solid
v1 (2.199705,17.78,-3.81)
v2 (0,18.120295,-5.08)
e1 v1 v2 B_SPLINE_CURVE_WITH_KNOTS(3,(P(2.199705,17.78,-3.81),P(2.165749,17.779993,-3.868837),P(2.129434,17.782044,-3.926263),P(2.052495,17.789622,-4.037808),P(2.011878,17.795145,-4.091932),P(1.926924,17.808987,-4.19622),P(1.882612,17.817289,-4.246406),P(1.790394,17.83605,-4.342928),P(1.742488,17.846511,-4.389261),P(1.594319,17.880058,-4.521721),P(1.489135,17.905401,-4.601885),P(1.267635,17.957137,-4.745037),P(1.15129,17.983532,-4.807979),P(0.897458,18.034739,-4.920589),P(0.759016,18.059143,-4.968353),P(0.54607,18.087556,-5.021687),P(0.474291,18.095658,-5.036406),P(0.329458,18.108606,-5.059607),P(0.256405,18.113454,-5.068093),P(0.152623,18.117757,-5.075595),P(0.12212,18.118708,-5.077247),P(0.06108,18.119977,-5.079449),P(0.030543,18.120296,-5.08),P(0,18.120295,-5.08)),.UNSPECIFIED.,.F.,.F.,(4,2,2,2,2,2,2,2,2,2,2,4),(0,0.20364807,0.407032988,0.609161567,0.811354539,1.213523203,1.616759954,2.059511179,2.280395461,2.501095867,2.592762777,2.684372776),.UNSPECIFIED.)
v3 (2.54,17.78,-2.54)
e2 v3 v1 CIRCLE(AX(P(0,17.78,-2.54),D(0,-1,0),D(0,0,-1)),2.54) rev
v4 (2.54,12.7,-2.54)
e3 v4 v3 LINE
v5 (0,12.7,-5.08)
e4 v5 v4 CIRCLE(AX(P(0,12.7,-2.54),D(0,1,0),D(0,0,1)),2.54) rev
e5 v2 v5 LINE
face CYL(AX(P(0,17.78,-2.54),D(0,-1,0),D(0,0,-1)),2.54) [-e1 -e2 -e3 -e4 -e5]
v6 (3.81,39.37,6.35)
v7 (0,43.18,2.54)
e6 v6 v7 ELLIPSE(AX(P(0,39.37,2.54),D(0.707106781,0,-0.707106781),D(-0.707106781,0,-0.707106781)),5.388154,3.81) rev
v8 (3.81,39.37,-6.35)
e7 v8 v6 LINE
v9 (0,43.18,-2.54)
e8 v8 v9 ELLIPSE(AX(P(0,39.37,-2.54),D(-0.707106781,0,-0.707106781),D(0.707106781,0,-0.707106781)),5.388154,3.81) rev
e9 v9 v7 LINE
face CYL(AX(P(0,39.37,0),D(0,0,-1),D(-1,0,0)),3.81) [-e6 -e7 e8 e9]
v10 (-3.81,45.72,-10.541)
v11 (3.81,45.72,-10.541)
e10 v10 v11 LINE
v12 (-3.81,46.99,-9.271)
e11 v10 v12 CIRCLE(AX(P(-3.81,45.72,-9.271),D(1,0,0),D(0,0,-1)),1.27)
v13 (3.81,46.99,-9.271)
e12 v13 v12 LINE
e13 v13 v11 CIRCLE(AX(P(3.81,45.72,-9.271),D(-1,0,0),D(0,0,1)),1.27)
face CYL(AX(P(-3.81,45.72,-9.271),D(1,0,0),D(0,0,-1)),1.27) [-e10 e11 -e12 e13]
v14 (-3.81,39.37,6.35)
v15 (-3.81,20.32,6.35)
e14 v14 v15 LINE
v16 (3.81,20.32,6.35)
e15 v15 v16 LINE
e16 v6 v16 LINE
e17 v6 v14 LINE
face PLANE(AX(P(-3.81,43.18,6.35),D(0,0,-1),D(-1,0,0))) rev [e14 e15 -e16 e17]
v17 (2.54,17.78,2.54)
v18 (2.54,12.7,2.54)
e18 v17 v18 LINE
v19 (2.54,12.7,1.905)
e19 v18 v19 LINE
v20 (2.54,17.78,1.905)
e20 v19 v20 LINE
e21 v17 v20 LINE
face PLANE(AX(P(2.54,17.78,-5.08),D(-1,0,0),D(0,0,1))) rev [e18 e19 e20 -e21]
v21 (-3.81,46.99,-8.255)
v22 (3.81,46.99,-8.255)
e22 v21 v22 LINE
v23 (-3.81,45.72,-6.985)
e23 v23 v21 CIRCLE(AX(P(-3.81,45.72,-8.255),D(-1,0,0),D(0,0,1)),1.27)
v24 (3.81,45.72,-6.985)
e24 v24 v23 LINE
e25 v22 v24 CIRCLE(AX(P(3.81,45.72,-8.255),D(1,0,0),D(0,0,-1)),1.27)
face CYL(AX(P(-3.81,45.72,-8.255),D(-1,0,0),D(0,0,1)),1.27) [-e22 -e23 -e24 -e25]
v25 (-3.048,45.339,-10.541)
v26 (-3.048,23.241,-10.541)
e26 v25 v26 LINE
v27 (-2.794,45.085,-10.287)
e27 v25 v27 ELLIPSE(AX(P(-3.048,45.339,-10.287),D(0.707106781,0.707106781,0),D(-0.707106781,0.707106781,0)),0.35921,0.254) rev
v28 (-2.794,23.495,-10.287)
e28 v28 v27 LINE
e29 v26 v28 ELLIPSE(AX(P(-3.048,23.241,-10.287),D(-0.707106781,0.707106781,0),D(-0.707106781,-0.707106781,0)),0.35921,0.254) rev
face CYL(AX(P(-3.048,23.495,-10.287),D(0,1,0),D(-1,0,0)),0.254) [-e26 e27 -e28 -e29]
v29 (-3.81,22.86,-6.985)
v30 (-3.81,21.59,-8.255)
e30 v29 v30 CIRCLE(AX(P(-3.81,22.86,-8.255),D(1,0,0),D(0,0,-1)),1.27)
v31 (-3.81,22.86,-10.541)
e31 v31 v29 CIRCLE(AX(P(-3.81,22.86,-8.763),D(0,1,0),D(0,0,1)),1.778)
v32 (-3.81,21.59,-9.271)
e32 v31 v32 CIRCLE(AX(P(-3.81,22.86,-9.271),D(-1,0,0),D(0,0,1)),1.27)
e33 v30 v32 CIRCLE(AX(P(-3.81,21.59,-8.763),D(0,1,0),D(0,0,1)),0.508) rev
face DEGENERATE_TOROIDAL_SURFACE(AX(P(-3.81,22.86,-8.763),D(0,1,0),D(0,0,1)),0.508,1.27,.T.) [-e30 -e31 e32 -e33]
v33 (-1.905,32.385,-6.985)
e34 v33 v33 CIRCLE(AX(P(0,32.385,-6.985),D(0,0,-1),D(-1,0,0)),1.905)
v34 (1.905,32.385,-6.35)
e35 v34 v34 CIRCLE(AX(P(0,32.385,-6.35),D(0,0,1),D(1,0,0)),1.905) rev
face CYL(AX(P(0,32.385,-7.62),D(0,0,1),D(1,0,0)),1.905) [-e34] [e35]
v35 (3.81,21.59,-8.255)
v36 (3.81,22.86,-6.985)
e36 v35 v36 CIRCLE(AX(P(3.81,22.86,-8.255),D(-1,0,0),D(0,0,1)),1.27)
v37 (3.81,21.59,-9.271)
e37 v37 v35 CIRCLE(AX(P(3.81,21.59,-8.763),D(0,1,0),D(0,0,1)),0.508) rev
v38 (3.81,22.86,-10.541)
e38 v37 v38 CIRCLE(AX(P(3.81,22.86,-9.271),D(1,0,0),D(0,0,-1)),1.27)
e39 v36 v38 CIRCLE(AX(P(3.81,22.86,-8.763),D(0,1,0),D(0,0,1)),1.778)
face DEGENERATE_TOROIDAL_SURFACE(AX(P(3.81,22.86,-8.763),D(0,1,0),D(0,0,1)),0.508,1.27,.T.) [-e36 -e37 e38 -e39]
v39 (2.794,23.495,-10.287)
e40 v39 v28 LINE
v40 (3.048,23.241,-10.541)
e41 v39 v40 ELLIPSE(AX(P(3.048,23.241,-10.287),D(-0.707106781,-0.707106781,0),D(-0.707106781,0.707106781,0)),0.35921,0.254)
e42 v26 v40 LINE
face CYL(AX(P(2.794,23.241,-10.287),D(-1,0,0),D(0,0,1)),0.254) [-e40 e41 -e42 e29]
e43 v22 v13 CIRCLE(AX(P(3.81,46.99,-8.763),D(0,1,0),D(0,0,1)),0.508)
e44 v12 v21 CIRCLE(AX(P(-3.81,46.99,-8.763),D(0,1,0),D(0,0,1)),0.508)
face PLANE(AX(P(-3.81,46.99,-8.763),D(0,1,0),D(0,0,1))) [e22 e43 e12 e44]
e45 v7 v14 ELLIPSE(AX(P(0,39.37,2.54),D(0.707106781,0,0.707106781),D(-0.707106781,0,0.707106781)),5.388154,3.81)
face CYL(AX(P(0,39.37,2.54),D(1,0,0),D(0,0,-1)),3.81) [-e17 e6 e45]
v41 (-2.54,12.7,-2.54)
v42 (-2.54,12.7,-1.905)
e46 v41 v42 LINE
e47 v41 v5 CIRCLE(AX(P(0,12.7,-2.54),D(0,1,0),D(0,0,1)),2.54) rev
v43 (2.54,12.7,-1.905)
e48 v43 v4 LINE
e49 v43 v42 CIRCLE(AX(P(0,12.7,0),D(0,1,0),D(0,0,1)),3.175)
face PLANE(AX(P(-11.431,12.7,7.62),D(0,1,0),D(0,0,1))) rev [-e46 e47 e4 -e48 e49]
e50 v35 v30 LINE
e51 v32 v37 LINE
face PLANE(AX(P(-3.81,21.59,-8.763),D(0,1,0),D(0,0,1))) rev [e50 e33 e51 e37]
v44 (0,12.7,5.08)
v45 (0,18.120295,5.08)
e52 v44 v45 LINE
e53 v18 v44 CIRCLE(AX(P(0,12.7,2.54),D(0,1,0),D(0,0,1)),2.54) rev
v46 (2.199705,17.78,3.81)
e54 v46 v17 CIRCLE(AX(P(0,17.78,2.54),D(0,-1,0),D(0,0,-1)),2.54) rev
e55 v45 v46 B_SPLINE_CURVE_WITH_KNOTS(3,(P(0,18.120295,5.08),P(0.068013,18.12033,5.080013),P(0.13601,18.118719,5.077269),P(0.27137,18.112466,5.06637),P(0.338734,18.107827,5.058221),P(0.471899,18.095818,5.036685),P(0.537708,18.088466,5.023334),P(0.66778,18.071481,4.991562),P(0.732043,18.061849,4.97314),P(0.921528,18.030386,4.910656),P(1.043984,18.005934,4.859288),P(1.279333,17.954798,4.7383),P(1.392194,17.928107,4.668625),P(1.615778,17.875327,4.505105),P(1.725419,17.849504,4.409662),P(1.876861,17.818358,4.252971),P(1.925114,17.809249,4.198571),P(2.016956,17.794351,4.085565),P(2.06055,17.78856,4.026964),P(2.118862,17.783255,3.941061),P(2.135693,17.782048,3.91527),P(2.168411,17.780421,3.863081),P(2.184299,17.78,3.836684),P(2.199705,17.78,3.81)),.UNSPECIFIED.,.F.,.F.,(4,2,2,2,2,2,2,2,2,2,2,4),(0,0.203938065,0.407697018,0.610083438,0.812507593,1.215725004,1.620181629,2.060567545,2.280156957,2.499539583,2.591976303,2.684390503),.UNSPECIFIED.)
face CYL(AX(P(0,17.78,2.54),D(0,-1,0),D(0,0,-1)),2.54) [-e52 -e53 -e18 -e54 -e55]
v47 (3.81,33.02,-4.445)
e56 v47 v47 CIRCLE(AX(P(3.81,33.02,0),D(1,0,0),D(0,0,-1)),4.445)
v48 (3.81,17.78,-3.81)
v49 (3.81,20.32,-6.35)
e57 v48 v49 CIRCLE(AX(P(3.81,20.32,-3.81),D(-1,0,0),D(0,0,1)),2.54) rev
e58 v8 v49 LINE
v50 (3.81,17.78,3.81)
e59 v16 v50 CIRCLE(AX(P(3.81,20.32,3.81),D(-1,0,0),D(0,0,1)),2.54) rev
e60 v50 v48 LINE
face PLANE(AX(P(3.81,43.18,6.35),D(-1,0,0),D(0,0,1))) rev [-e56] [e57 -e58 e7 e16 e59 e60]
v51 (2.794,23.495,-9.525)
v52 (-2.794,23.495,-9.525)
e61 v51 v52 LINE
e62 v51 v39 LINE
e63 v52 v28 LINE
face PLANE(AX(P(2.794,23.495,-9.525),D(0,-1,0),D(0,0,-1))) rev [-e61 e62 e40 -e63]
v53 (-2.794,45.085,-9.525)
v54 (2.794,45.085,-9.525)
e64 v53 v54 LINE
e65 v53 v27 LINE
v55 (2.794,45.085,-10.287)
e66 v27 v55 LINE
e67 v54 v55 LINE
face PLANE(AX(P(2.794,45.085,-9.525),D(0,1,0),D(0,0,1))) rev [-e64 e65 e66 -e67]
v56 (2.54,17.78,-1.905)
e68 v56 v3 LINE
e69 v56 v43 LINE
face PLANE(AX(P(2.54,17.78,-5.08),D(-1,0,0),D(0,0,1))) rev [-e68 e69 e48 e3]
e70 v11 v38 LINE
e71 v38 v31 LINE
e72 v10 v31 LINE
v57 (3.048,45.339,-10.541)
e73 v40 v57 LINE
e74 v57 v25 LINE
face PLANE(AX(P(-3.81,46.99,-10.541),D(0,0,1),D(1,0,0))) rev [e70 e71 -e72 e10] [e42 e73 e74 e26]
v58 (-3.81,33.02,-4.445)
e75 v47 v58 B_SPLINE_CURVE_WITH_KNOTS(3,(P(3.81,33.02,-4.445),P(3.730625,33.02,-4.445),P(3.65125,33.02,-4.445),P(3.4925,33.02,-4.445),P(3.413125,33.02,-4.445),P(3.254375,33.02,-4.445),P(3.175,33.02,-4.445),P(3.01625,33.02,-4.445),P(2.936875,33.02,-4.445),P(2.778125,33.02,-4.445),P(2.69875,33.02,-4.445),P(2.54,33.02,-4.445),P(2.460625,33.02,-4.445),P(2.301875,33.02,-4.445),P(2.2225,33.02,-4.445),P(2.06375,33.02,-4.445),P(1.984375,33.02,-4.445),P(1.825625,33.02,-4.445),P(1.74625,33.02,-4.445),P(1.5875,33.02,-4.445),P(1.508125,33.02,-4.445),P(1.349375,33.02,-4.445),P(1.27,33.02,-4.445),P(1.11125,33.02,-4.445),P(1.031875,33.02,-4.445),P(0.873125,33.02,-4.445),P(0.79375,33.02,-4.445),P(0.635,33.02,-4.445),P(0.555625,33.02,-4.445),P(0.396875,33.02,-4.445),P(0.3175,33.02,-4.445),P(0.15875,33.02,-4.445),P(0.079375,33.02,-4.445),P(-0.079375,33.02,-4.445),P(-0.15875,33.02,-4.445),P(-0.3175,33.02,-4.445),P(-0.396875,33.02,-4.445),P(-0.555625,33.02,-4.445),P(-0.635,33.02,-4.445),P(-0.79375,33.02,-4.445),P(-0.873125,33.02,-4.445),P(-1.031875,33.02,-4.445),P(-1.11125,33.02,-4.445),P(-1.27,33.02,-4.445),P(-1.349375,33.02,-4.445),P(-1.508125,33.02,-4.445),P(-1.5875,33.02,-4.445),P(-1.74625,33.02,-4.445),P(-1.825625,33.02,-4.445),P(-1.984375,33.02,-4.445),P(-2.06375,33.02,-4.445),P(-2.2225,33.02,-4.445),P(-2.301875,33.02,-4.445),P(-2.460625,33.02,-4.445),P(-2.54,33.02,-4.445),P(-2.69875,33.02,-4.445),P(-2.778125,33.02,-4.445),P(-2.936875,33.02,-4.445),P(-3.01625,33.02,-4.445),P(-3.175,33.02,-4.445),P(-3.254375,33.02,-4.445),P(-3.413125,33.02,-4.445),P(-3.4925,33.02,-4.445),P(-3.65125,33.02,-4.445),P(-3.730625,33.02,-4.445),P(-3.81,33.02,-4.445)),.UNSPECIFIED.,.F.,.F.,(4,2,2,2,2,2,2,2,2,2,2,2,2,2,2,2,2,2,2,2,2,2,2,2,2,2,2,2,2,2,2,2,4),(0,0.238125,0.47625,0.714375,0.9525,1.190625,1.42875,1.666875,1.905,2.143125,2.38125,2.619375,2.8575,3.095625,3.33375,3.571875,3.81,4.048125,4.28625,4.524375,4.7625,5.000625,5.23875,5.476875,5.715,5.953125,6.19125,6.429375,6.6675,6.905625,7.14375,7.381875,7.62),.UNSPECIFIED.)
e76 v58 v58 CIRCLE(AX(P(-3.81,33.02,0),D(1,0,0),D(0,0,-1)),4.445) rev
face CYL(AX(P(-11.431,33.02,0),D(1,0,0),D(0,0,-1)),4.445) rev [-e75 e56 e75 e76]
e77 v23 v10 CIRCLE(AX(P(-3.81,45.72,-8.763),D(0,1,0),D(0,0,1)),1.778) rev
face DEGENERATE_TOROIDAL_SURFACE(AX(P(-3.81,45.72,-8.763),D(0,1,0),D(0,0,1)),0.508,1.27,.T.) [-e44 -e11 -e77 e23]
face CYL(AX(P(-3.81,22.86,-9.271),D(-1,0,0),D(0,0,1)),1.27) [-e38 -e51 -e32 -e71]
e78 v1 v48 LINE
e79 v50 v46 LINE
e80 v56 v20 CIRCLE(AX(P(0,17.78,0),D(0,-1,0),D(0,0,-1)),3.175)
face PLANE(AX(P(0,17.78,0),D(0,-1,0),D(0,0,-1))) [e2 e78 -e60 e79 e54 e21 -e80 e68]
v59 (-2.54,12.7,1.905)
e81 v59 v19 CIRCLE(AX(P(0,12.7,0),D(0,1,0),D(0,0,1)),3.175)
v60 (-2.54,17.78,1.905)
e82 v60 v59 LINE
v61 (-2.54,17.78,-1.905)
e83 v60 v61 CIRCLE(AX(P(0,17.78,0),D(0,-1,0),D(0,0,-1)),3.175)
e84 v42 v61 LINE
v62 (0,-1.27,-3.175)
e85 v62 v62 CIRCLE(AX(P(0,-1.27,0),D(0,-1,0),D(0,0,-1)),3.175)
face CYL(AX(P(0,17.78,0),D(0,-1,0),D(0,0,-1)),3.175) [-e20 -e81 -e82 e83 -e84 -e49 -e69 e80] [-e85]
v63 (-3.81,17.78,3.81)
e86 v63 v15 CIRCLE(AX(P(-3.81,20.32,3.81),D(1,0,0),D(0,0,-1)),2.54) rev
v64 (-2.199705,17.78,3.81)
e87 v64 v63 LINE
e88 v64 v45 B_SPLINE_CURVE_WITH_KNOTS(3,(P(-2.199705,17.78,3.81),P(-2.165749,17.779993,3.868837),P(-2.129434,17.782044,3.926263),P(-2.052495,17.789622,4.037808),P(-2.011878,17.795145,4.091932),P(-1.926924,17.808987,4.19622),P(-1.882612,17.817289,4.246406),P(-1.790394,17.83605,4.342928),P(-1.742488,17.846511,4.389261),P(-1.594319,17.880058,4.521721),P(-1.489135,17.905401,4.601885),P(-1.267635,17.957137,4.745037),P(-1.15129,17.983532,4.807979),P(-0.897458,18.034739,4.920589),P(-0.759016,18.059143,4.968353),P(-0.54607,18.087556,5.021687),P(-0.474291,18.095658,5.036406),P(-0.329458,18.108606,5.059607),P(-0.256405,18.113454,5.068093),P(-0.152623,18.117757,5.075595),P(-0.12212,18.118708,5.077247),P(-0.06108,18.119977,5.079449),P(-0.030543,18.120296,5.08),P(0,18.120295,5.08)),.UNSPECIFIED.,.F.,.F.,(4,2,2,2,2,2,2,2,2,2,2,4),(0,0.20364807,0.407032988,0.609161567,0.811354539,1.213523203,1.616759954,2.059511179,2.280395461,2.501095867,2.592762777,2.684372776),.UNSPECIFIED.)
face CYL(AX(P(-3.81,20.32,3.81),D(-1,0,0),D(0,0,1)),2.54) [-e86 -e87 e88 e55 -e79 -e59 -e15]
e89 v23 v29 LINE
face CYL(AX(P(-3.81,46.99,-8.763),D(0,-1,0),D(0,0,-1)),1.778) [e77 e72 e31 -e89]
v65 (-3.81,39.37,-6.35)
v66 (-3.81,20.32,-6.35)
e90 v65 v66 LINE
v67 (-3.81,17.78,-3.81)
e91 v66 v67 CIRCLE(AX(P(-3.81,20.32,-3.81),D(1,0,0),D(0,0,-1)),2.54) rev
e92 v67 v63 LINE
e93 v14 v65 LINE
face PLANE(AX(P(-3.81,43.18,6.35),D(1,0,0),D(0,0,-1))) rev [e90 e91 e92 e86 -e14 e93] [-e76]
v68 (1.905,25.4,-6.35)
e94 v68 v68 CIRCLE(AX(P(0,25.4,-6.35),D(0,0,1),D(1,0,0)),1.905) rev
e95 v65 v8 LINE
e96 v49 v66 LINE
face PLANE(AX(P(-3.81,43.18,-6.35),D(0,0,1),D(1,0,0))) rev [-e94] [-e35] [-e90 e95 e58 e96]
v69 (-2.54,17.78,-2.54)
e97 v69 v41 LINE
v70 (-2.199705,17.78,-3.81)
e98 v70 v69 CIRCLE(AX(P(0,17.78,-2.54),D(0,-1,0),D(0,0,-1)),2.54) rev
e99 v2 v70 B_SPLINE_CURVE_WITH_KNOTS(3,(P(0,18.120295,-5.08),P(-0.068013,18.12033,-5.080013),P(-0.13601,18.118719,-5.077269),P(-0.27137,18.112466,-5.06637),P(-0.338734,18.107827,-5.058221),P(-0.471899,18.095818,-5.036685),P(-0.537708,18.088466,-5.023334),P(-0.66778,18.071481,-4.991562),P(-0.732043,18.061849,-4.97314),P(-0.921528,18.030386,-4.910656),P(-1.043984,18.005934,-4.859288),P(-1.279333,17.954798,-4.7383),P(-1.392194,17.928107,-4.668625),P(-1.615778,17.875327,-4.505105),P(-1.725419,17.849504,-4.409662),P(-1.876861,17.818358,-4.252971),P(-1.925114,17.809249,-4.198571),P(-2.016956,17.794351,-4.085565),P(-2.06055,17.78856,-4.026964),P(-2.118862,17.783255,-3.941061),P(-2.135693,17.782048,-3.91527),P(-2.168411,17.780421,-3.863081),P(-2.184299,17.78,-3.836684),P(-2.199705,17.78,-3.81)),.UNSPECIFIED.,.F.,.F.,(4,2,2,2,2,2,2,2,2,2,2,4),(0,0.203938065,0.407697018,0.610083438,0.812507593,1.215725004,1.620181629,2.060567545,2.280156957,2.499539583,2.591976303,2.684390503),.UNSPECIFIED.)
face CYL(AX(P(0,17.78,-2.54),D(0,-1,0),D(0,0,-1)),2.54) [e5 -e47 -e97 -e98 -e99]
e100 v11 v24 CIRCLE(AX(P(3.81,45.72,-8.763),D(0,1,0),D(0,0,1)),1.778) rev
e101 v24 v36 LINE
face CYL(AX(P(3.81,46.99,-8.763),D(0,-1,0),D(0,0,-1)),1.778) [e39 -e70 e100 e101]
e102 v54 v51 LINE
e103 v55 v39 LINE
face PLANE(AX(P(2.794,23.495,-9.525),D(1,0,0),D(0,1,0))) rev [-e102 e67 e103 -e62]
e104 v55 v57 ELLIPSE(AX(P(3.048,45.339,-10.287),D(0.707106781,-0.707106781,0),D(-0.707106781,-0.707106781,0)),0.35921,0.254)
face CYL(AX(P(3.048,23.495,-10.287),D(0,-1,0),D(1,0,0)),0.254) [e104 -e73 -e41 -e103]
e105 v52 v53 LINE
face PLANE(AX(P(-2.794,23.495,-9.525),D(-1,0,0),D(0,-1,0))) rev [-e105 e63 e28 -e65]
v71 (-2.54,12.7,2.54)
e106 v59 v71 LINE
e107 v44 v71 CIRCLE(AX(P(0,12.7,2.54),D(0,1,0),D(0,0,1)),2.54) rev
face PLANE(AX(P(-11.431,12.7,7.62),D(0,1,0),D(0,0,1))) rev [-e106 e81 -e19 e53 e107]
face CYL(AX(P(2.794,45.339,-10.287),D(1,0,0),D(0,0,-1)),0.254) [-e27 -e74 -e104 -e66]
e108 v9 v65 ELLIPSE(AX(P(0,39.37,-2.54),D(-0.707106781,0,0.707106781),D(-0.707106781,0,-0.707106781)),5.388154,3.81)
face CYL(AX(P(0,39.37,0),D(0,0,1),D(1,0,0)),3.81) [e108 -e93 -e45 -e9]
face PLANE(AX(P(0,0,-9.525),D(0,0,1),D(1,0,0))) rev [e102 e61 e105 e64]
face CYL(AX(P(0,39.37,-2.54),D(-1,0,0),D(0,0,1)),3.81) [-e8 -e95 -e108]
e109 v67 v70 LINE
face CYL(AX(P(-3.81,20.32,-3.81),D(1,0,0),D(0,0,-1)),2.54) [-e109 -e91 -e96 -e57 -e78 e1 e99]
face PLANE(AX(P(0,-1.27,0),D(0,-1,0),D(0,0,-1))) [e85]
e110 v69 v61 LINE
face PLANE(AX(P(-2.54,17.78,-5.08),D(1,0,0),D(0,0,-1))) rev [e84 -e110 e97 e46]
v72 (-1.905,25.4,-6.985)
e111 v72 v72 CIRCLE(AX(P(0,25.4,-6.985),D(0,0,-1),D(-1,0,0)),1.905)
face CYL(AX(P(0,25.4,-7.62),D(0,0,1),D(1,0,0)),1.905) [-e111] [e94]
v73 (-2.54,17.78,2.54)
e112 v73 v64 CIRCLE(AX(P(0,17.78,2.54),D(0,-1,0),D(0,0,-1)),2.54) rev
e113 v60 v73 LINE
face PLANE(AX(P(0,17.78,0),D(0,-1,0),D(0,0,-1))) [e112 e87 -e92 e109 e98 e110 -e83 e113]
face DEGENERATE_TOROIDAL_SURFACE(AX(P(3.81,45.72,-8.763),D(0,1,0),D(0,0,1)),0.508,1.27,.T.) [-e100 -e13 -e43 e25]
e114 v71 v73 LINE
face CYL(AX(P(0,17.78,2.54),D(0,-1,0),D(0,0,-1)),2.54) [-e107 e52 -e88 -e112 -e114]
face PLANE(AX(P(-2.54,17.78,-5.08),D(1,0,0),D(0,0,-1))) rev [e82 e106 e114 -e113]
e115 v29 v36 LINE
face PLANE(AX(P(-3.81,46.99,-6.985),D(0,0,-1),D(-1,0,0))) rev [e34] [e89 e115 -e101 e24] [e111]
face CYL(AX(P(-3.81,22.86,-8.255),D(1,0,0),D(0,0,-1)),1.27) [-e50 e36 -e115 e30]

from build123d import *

# Parameters (mm, degrees)
SKETCH1_W                = 15.24
SKETCH1_H                = 25.4
BOSS_EXTRUDE1_DEPTH      = 5.08
FILLET1_R                = 2.54
SKETCH2_R                = 3.175
BOSS_EXTRUDE2_DEPTH      = 6.35
SKETCH3_W                = 5.08
SKETCH3_H                = 10.16
BOSS_EXTRUDE3_DEPTH      = 5.08
SKETCH4_W                = 7.62
SKETCH4_H                = 12.7
BOSS_EXTRUDE4_DEPTH      = 25.4
FILLET2_R                = 2.54
FILLET3_R                = 3.81
SKETCH5_R                = 1.905
BOSS_EXTRUDE5_DEPTH      = 1.27
BOSS_EXTRUDE6_DEPTH      = 25.4
FILLET4_R                = 1.27
SKETCH7_W                = 5.588
SKETCH7_H                = 21.59
CUT_EXTRUDE1_DEPTH       = 1.016
FILLET5_R                = 0.254
CUT_EXTRUDE2_REACH       = 52.512
SKETCH8_R                = 4.445
FILLET6_R                = 0.635
CUT_EXTRUDE3_REACH       = 55.308
SKETCH9_W                = 15.24
SKETCH9_H                = 25.4
BOSS_EXTRUDE7_DEPTH      = 13.97
BOSS_EXTRUDE7_DEPTH_BACK = 5.08
SKETCH10_R               = 3.175
FILLET7_R                = 2.54


# Some blends are built 0.0001 mm under size
with BuildPart() as part:
    # Sketch1 → Boss-Extrude1 (new, symmetric)
    with BuildSketch(Plane(origin=(0, 0, 0), x_dir=(0, 0, -1), z_dir=(1, 0, 0))):
        Rectangle(SKETCH1_W, SKETCH1_H)
    extrude(amount=BOSS_EXTRUDE1_DEPTH, both=True)

    # Fillet1
    fillet1_edges = [part.edges().sort_by_distance(p)[0] for p in [
        (5.08, 0, 7.62),
        (5.08, -12.7, 0),
        (5.08, 0, -7.62),
        (-5.08, -12.7, 0),
        (-5.08, 0, 7.62),
        (-5.08, 12.7, 0),
        (-5.08, 0, -7.62),
        (5.08, 12.7, 0),
        (0, -12.7, -7.62),
        (0, -12.7, 7.62),
        (0, 12.7, 7.62),
        (0, 12.7, -7.62),
    ]]
    fillet(fillet1_edges, radius=FILLET1_R)

    # Sketch2 → Boss-Extrude2 (add)
    with BuildSketch(Plane(origin=(5.08, 0, 0), x_dir=(0, 0, -1), z_dir=(1, 0, 0))):
        with Locations(Location((0, 6.985, 0), (0, 0, 90))):
            Circle(SKETCH2_R)
        with Locations(Location((0, -6.985, 0), (0, 0, 270))):
            Circle(SKETCH2_R)
    boss_extrude2 = extrude(amount=BOSS_EXTRUDE2_DEPTH)

    # Mirror1: Boss-Extrude2 across plane
    add(boss_extrude2.mirror(Plane(origin=(0, 0, 0), x_dir=(0, 0, 1), z_dir=(1, 0, 0))))

    # Sketch3 → Boss-Extrude3 (add)
    with BuildSketch(Plane(origin=(0, 12.7, 0), x_dir=(1, 0, 0), z_dir=(0, 1, 0))):
        Rectangle(SKETCH3_W, SKETCH3_H)
    extrude(amount=BOSS_EXTRUDE3_DEPTH)

    # Sketch4 → Boss-Extrude4 (add)
    with BuildSketch(Plane(origin=(0, 17.78, 0), x_dir=(1, 0, 0), z_dir=(0, 1, 0))):
        Rectangle(SKETCH4_W, SKETCH4_H)
    extrude(amount=BOSS_EXTRUDE4_DEPTH)

    # Fillet2
    # the kernel refuses this fillet: 2.54 mm, written as the material it takes off along each edge
    with BuildSketch(Plane(origin=(10.16, 17.78, -6.35), x_dir=(0, 0, 1), z_dir=(-1, 0, 0))) as fillet2_piece_1_section:
        with BuildLine():
            CenterArc((FILLET2_R, FILLET2_R), FILLET2_R, 180, 90)
            Line((0, FILLET2_R), (0, 0))
            Line((0, 0), (FILLET2_R, 0))
        make_face()
    fillet2_piece_1 = extrude(amount=20.32, mode=Mode.PRIVATE)
    fillet2_piece_1 = split(fillet2_piece_1, bisect_by=Plane(origin=(6.35, 17.840981289, -5.08), z_dir=(0, 0, 1)), keep=Keep.TOP, mode=Mode.PRIVATE)
    fillet2_piece_1 = split(fillet2_piece_1, bisect_by=Plane(origin=(2.54, 17.840981289, -4.665343007), z_dir=(1, 0, 0)), keep=Keep.TOP, mode=Mode.PRIVATE)
    add(fillet2_piece_1, mode=Mode.SUBTRACT)
    with BuildSketch(Plane(origin=(10.16, 17.78, -6.35), x_dir=(0, 0, 1), z_dir=(-1, 0, 0))) as fillet2_piece_2_section:
        with BuildLine():
            CenterArc((FILLET2_R, FILLET2_R), FILLET2_R, 180, 90)
            Line((0, FILLET2_R), (0, 0))
            Line((0, 0), (FILLET2_R, 0))
        make_face()
    fillet2_piece_2 = extrude(amount=20.32, mode=Mode.PRIVATE)
    fillet2_piece_2 = split(fillet2_piece_2, bisect_by=Plane(origin=(6.35, 18.428004952, -5.08), z_dir=(0, 0, -1)), keep=Keep.TOP, mode=Mode.PRIVATE)
    fillet2_piece_2 = split(fillet2_piece_2, bisect_by=Plane(origin=(2.54, 18.428004952, -5.932444919), z_dir=(1, 0, 0)), keep=Keep.TOP, mode=Mode.PRIVATE)
    add(fillet2_piece_2, mode=Mode.SUBTRACT)
    with BuildSketch(Plane(origin=(10.16, 17.78, -6.35), x_dir=(0, 0, 1), z_dir=(-1, 0, 0))) as fillet2_piece_3_section:
        with BuildLine():
            CenterArc((FILLET2_R, FILLET2_R), FILLET2_R, 180, 90)
            Line((0, FILLET2_R), (0, 0))
            Line((0, 0), (FILLET2_R, 0))
        make_face()
    fillet2_piece_3 = extrude(amount=20.32, mode=Mode.PRIVATE)
    fillet2_piece_3 = split(fillet2_piece_3, bisect_by=Plane(origin=(0, 18.428004952, -5.08), z_dir=(0, 0, -1)), keep=Keep.TOP, mode=Mode.PRIVATE)
    fillet2_piece_3 = split(fillet2_piece_3, bisect_by=Plane(origin=(-2.54, 18.428004952, -5.932444919), z_dir=(1, 0, 0)), keep=Keep.TOP, mode=Mode.PRIVATE)
    fillet2_piece_3 = split(fillet2_piece_3, bisect_by=Plane(origin=(2.54, 18.428004952, -5.932444919), z_dir=(-1, 0, 0)), keep=Keep.TOP, mode=Mode.PRIVATE)
    add(fillet2_piece_3, mode=Mode.SUBTRACT)
    with BuildSketch(Plane(origin=(10.16, 17.78, -6.35), x_dir=(0, 0, 1), z_dir=(-1, 0, 0))) as fillet2_piece_4_section:
        with BuildLine():
            CenterArc((FILLET2_R, FILLET2_R), FILLET2_R, 180, 90)
            Line((0, FILLET2_R), (0, 0))
            Line((0, 0), (FILLET2_R, 0))
        make_face()
    fillet2_piece_4 = extrude(amount=20.32, mode=Mode.PRIVATE)
    fillet2_piece_4 = split(fillet2_piece_4, bisect_by=Plane(origin=(-6.35, 17.840981289, -5.08), z_dir=(0, 0, 1)), keep=Keep.TOP, mode=Mode.PRIVATE)
    fillet2_piece_4 = split(fillet2_piece_4, bisect_by=Plane(origin=(-2.54, 17.840981289, -4.665343007), z_dir=(-1, 0, 0)), keep=Keep.TOP, mode=Mode.PRIVATE)
    add(fillet2_piece_4, mode=Mode.SUBTRACT)
    with BuildSketch(Plane(origin=(10.16, 17.78, -6.35), x_dir=(0, 0, 1), z_dir=(-1, 0, 0))) as fillet2_piece_5_section:
        with BuildLine():
            CenterArc((FILLET2_R, FILLET2_R), FILLET2_R, 180, 90)
            Line((0, FILLET2_R), (0, 0))
            Line((0, 0), (FILLET2_R, 0))
        make_face()
    fillet2_piece_5 = extrude(amount=20.32, mode=Mode.PRIVATE)
    fillet2_piece_5 = split(fillet2_piece_5, bisect_by=Plane(origin=(-6.35, 18.428004952, -5.08), z_dir=(0, 0, -1)), keep=Keep.TOP, mode=Mode.PRIVATE)
    fillet2_piece_5 = split(fillet2_piece_5, bisect_by=Plane(origin=(-2.54, 18.428004952, -5.932444919), z_dir=(-1, 0, 0)), keep=Keep.TOP, mode=Mode.PRIVATE)
    add(fillet2_piece_5, mode=Mode.SUBTRACT)
    with BuildSketch(Plane(origin=(-10.16, 17.78, 6.35), x_dir=(0, 1, 0), z_dir=(1, 0, 0))) as fillet2_piece_6_section:
        with BuildLine():
            CenterArc((FILLET2_R, -FILLET2_R), FILLET2_R, 90, 90)
            Line((0, -FILLET2_R), (0, 0))
            Line((0, 0), (FILLET2_R, 0))
        make_face()
    fillet2_piece_6 = extrude(amount=20.32, mode=Mode.PRIVATE)
    fillet2_piece_6 = split(fillet2_piece_6, bisect_by=Plane(origin=(-2.54, 18.428004952, 5.932444919), z_dir=(-1, 0, 0)), keep=Keep.TOP, mode=Mode.PRIVATE)
    fillet2_piece_6 = split(fillet2_piece_6, bisect_by=Plane(origin=(-6.35, 18.428004952, 5.08), z_dir=(0, 0, 1)), keep=Keep.TOP, mode=Mode.PRIVATE)
    add(fillet2_piece_6, mode=Mode.SUBTRACT)
    with BuildSketch(Plane(origin=(-10.16, 17.78, 6.35), x_dir=(0, 1, 0), z_dir=(1, 0, 0))) as fillet2_piece_7_section:
        with BuildLine():
            CenterArc((FILLET2_R, -FILLET2_R), FILLET2_R, 90, 90)
            Line((0, -FILLET2_R), (0, 0))
            Line((0, 0), (FILLET2_R, 0))
        make_face()
    fillet2_piece_7 = extrude(amount=20.32, mode=Mode.PRIVATE)
    fillet2_piece_7 = split(fillet2_piece_7, bisect_by=Plane(origin=(-2.54, 17.840981289, 4.665343007), z_dir=(-1, 0, 0)), keep=Keep.TOP, mode=Mode.PRIVATE)
    fillet2_piece_7 = split(fillet2_piece_7, bisect_by=Plane(origin=(-6.35, 17.840981289, 5.08), z_dir=(0, 0, -1)), keep=Keep.TOP, mode=Mode.PRIVATE)
    add(fillet2_piece_7, mode=Mode.SUBTRACT)
    with BuildSketch(Plane(origin=(-10.16, 17.78, 6.35), x_dir=(0, 1, 0), z_dir=(1, 0, 0))) as fillet2_piece_8_section:
        with BuildLine():
            CenterArc((FILLET2_R, -FILLET2_R), FILLET2_R, 90, 90)
            Line((0, -FILLET2_R), (0, 0))
            Line((0, 0), (FILLET2_R, 0))
        make_face()
    fillet2_piece_8 = extrude(amount=20.32, mode=Mode.PRIVATE)
    fillet2_piece_8 = split(fillet2_piece_8, bisect_by=Plane(origin=(-2.54, 18.428004952, 5.932444919), z_dir=(1, 0, 0)), keep=Keep.TOP, mode=Mode.PRIVATE)
    fillet2_piece_8 = split(fillet2_piece_8, bisect_by=Plane(origin=(0, 18.428004952, 5.08), z_dir=(0, 0, 1)), keep=Keep.TOP, mode=Mode.PRIVATE)
    fillet2_piece_8 = split(fillet2_piece_8, bisect_by=Plane(origin=(2.54, 18.428004952, 5.932444919), z_dir=(-1, 0, 0)), keep=Keep.TOP, mode=Mode.PRIVATE)
    add(fillet2_piece_8, mode=Mode.SUBTRACT)
    with BuildSketch(Plane(origin=(-10.16, 17.78, 6.35), x_dir=(0, 1, 0), z_dir=(1, 0, 0))) as fillet2_piece_9_section:
        with BuildLine():
            CenterArc((FILLET2_R, -FILLET2_R), FILLET2_R, 90, 90)
            Line((0, -FILLET2_R), (0, 0))
            Line((0, 0), (FILLET2_R, 0))
        make_face()
    fillet2_piece_9 = extrude(amount=20.32, mode=Mode.PRIVATE)
    fillet2_piece_9 = split(fillet2_piece_9, bisect_by=Plane(origin=(6.35, 18.428004952, 5.08), z_dir=(0, 0, 1)), keep=Keep.TOP, mode=Mode.PRIVATE)
    fillet2_piece_9 = split(fillet2_piece_9, bisect_by=Plane(origin=(2.54, 18.428004952, 5.932444919), z_dir=(1, 0, 0)), keep=Keep.TOP, mode=Mode.PRIVATE)
    add(fillet2_piece_9, mode=Mode.SUBTRACT)
    with BuildSketch(Plane(origin=(-10.16, 17.78, 6.35), x_dir=(0, 1, 0), z_dir=(1, 0, 0))) as fillet2_piece_10_section:
        with BuildLine():
            CenterArc((FILLET2_R, -FILLET2_R), FILLET2_R, 90, 90)
            Line((0, -FILLET2_R), (0, 0))
            Line((0, 0), (FILLET2_R, 0))
        make_face()
    fillet2_piece_10 = extrude(amount=20.32, mode=Mode.PRIVATE)
    fillet2_piece_10 = split(fillet2_piece_10, bisect_by=Plane(origin=(6.35, 17.840981289, 5.08), z_dir=(0, 0, -1)), keep=Keep.TOP, mode=Mode.PRIVATE)
    fillet2_piece_10 = split(fillet2_piece_10, bisect_by=Plane(origin=(2.54, 17.840981289, 4.665343007), z_dir=(1, 0, 0)), keep=Keep.TOP, mode=Mode.PRIVATE)
    add(fillet2_piece_10, mode=Mode.SUBTRACT)

    # Fillet3
    fillet3_edges = [part.edges().sort_by_distance(p)[0] for p in [
        (3.81, 43.18, 0),
        (0, 43.18, -6.35),
        (-3.81, 43.18, 0),
        (0, 43.18, 6.35),
    ]]
    fillet(fillet3_edges, radius=FILLET3_R - 0.0001)  # a hair under: the kernel refuses the full size

    # Sketch5 → Boss-Extrude5 (add)
    with BuildSketch(Plane(origin=(0, 0, -6.35), x_dir=(-1, 0, 0), z_dir=(0, 0, -1))):
        with Locations(Location((0, 32.385, 0), (0, 0, 180))):
            Circle(SKETCH5_R)
        with Locations(Location((0, 25.4, 0), (0, 0, 180))):
            Circle(SKETCH5_R)
    extrude(amount=BOSS_EXTRUDE5_DEPTH)

    # Sketch6 → Boss-Extrude6 (add)
    with BuildSketch(Plane(origin=(0, 21.59, 0), x_dir=(1, 0, 0), z_dir=(0, 1, 0))):
        with BuildLine():
            Line((-3.81, 10.541), (3.81, 10.541))
            ThreePointArc((3.81, 10.541), (5.588, 8.763), (3.81, 6.985))
            Line((3.81, 6.985), (-3.81, 6.985))
            ThreePointArc((-3.81, 6.985), (-5.588, 8.763), (-3.81, 10.541))
        make_face()
    extrude(amount=BOSS_EXTRUDE6_DEPTH)

    # Fillet4
    fillet4_edges = [part.edges().sort_by_distance(p)[0] for p in [
        (0, 21.59, -6.985),
        (-5.588, 21.59, -8.763),
        (5.588, 21.59, -8.763),
        (0, 21.59, -10.541),
        (-5.588, 46.99, -8.763),
        (0, 46.99, -6.985),
        (5.588, 46.99, -8.763),
        (0, 46.99, -10.541),
    ]]
    fillet(fillet4_edges, radius=FILLET4_R)

    # Sketch7 → Cut-Extrude1 (cut)
    with BuildSketch(Plane(origin=(0, 0, -10.541), x_dir=(-1, 0, 0), z_dir=(0, 0, -1))):
        with Locations((0, 34.29)):
            Rectangle(SKETCH7_W, SKETCH7_H)
    extrude(amount=-CUT_EXTRUDE1_DEPTH, mode=Mode.SUBTRACT)

    # Fillet5
    fillet5_edges = [part.edges().sort_by_distance(p)[0] for p in [
        (-2.794, 34.29, -10.541),
        (0, 45.085, -10.541),
        (2.794, 34.29, -10.541),
        (0, 23.495, -10.541),
    ]]
    fillet(fillet5_edges, radius=FILLET5_R)

    # Sketch8 → Cut-Extrude2 (cut, up to next)
    with BuildSketch(Plane(origin=(3.81, 0, 0), x_dir=(0, 0, -1), z_dir=(1, 0, 0)), mode=Mode.PRIVATE) as cut_extrude2_sk1:
        with Locations((0, 33.02)):
            Circle(SKETCH8_R)
    cut_extrude2_tool1 = extrude(cut_extrude2_sk1.sketch, amount=-CUT_EXTRUDE2_REACH, mode=Mode.PRIVATE) & part.part
    add(cut_extrude2_tool1.solids().sort_by_distance((3.81, 33.02, 0))[0], mode=Mode.SUBTRACT)

    # Fillet6
    fillet6_edges = [part.edges().sort_by_distance(p)[0] for p in [
        (11.43, 3.81, 0),
        (11.43, -3.81, 0),
        (-11.43, 3.81, 0),
        (-11.43, -3.81, 0),
    ]]
    fillet(fillet6_edges, radius=FILLET6_R)

    # Sketch9 → Cut-Extrude3 (cut, up to next)
    with BuildSketch(Plane(origin=(11.43, 0, 0), x_dir=(0, 0, -1), z_dir=(1, 0, 0)), mode=Mode.PRIVATE) as cut_extrude3_sk1:
        Rectangle(SKETCH9_W, SKETCH9_H)
    cut_extrude3_tool1 = extrude(cut_extrude3_sk1.sketch, amount=-CUT_EXTRUDE3_REACH, mode=Mode.PRIVATE) & part.part
    add(cut_extrude3_tool1.solids().sort_by_distance((11.43, 0, 0))[0], mode=Mode.SUBTRACT)

    # Sketch10 → Boss-Extrude7 (add, two sides: drawn at the far end of the back side and taken through both)
    with BuildSketch(Plane.XZ.offset(-12.7).offset(-BOSS_EXTRUDE7_DEPTH_BACK)):
        with Locations(Location((0, 0, 0), (0, 0, 270))):
            Circle(SKETCH10_R)
    extrude(amount=BOSS_EXTRUDE7_DEPTH + BOSS_EXTRUDE7_DEPTH_BACK)

    # Fillet7
    fillet7_edges = [part.edges().sort_by_distance(p)[0] for p in [
        (-2.54, 15.410147737, 5.08),
        (2.54, 15.410147737, 5.08),
        (-2.54, 15.410147737, -5.08),
        (2.54, 15.410147737, -5.08),
    ]]
    fillet(fillet7_edges, radius=FILLET7_R - 0.0001)  # a hair under: the kernel refuses the full size


solid = part.part
